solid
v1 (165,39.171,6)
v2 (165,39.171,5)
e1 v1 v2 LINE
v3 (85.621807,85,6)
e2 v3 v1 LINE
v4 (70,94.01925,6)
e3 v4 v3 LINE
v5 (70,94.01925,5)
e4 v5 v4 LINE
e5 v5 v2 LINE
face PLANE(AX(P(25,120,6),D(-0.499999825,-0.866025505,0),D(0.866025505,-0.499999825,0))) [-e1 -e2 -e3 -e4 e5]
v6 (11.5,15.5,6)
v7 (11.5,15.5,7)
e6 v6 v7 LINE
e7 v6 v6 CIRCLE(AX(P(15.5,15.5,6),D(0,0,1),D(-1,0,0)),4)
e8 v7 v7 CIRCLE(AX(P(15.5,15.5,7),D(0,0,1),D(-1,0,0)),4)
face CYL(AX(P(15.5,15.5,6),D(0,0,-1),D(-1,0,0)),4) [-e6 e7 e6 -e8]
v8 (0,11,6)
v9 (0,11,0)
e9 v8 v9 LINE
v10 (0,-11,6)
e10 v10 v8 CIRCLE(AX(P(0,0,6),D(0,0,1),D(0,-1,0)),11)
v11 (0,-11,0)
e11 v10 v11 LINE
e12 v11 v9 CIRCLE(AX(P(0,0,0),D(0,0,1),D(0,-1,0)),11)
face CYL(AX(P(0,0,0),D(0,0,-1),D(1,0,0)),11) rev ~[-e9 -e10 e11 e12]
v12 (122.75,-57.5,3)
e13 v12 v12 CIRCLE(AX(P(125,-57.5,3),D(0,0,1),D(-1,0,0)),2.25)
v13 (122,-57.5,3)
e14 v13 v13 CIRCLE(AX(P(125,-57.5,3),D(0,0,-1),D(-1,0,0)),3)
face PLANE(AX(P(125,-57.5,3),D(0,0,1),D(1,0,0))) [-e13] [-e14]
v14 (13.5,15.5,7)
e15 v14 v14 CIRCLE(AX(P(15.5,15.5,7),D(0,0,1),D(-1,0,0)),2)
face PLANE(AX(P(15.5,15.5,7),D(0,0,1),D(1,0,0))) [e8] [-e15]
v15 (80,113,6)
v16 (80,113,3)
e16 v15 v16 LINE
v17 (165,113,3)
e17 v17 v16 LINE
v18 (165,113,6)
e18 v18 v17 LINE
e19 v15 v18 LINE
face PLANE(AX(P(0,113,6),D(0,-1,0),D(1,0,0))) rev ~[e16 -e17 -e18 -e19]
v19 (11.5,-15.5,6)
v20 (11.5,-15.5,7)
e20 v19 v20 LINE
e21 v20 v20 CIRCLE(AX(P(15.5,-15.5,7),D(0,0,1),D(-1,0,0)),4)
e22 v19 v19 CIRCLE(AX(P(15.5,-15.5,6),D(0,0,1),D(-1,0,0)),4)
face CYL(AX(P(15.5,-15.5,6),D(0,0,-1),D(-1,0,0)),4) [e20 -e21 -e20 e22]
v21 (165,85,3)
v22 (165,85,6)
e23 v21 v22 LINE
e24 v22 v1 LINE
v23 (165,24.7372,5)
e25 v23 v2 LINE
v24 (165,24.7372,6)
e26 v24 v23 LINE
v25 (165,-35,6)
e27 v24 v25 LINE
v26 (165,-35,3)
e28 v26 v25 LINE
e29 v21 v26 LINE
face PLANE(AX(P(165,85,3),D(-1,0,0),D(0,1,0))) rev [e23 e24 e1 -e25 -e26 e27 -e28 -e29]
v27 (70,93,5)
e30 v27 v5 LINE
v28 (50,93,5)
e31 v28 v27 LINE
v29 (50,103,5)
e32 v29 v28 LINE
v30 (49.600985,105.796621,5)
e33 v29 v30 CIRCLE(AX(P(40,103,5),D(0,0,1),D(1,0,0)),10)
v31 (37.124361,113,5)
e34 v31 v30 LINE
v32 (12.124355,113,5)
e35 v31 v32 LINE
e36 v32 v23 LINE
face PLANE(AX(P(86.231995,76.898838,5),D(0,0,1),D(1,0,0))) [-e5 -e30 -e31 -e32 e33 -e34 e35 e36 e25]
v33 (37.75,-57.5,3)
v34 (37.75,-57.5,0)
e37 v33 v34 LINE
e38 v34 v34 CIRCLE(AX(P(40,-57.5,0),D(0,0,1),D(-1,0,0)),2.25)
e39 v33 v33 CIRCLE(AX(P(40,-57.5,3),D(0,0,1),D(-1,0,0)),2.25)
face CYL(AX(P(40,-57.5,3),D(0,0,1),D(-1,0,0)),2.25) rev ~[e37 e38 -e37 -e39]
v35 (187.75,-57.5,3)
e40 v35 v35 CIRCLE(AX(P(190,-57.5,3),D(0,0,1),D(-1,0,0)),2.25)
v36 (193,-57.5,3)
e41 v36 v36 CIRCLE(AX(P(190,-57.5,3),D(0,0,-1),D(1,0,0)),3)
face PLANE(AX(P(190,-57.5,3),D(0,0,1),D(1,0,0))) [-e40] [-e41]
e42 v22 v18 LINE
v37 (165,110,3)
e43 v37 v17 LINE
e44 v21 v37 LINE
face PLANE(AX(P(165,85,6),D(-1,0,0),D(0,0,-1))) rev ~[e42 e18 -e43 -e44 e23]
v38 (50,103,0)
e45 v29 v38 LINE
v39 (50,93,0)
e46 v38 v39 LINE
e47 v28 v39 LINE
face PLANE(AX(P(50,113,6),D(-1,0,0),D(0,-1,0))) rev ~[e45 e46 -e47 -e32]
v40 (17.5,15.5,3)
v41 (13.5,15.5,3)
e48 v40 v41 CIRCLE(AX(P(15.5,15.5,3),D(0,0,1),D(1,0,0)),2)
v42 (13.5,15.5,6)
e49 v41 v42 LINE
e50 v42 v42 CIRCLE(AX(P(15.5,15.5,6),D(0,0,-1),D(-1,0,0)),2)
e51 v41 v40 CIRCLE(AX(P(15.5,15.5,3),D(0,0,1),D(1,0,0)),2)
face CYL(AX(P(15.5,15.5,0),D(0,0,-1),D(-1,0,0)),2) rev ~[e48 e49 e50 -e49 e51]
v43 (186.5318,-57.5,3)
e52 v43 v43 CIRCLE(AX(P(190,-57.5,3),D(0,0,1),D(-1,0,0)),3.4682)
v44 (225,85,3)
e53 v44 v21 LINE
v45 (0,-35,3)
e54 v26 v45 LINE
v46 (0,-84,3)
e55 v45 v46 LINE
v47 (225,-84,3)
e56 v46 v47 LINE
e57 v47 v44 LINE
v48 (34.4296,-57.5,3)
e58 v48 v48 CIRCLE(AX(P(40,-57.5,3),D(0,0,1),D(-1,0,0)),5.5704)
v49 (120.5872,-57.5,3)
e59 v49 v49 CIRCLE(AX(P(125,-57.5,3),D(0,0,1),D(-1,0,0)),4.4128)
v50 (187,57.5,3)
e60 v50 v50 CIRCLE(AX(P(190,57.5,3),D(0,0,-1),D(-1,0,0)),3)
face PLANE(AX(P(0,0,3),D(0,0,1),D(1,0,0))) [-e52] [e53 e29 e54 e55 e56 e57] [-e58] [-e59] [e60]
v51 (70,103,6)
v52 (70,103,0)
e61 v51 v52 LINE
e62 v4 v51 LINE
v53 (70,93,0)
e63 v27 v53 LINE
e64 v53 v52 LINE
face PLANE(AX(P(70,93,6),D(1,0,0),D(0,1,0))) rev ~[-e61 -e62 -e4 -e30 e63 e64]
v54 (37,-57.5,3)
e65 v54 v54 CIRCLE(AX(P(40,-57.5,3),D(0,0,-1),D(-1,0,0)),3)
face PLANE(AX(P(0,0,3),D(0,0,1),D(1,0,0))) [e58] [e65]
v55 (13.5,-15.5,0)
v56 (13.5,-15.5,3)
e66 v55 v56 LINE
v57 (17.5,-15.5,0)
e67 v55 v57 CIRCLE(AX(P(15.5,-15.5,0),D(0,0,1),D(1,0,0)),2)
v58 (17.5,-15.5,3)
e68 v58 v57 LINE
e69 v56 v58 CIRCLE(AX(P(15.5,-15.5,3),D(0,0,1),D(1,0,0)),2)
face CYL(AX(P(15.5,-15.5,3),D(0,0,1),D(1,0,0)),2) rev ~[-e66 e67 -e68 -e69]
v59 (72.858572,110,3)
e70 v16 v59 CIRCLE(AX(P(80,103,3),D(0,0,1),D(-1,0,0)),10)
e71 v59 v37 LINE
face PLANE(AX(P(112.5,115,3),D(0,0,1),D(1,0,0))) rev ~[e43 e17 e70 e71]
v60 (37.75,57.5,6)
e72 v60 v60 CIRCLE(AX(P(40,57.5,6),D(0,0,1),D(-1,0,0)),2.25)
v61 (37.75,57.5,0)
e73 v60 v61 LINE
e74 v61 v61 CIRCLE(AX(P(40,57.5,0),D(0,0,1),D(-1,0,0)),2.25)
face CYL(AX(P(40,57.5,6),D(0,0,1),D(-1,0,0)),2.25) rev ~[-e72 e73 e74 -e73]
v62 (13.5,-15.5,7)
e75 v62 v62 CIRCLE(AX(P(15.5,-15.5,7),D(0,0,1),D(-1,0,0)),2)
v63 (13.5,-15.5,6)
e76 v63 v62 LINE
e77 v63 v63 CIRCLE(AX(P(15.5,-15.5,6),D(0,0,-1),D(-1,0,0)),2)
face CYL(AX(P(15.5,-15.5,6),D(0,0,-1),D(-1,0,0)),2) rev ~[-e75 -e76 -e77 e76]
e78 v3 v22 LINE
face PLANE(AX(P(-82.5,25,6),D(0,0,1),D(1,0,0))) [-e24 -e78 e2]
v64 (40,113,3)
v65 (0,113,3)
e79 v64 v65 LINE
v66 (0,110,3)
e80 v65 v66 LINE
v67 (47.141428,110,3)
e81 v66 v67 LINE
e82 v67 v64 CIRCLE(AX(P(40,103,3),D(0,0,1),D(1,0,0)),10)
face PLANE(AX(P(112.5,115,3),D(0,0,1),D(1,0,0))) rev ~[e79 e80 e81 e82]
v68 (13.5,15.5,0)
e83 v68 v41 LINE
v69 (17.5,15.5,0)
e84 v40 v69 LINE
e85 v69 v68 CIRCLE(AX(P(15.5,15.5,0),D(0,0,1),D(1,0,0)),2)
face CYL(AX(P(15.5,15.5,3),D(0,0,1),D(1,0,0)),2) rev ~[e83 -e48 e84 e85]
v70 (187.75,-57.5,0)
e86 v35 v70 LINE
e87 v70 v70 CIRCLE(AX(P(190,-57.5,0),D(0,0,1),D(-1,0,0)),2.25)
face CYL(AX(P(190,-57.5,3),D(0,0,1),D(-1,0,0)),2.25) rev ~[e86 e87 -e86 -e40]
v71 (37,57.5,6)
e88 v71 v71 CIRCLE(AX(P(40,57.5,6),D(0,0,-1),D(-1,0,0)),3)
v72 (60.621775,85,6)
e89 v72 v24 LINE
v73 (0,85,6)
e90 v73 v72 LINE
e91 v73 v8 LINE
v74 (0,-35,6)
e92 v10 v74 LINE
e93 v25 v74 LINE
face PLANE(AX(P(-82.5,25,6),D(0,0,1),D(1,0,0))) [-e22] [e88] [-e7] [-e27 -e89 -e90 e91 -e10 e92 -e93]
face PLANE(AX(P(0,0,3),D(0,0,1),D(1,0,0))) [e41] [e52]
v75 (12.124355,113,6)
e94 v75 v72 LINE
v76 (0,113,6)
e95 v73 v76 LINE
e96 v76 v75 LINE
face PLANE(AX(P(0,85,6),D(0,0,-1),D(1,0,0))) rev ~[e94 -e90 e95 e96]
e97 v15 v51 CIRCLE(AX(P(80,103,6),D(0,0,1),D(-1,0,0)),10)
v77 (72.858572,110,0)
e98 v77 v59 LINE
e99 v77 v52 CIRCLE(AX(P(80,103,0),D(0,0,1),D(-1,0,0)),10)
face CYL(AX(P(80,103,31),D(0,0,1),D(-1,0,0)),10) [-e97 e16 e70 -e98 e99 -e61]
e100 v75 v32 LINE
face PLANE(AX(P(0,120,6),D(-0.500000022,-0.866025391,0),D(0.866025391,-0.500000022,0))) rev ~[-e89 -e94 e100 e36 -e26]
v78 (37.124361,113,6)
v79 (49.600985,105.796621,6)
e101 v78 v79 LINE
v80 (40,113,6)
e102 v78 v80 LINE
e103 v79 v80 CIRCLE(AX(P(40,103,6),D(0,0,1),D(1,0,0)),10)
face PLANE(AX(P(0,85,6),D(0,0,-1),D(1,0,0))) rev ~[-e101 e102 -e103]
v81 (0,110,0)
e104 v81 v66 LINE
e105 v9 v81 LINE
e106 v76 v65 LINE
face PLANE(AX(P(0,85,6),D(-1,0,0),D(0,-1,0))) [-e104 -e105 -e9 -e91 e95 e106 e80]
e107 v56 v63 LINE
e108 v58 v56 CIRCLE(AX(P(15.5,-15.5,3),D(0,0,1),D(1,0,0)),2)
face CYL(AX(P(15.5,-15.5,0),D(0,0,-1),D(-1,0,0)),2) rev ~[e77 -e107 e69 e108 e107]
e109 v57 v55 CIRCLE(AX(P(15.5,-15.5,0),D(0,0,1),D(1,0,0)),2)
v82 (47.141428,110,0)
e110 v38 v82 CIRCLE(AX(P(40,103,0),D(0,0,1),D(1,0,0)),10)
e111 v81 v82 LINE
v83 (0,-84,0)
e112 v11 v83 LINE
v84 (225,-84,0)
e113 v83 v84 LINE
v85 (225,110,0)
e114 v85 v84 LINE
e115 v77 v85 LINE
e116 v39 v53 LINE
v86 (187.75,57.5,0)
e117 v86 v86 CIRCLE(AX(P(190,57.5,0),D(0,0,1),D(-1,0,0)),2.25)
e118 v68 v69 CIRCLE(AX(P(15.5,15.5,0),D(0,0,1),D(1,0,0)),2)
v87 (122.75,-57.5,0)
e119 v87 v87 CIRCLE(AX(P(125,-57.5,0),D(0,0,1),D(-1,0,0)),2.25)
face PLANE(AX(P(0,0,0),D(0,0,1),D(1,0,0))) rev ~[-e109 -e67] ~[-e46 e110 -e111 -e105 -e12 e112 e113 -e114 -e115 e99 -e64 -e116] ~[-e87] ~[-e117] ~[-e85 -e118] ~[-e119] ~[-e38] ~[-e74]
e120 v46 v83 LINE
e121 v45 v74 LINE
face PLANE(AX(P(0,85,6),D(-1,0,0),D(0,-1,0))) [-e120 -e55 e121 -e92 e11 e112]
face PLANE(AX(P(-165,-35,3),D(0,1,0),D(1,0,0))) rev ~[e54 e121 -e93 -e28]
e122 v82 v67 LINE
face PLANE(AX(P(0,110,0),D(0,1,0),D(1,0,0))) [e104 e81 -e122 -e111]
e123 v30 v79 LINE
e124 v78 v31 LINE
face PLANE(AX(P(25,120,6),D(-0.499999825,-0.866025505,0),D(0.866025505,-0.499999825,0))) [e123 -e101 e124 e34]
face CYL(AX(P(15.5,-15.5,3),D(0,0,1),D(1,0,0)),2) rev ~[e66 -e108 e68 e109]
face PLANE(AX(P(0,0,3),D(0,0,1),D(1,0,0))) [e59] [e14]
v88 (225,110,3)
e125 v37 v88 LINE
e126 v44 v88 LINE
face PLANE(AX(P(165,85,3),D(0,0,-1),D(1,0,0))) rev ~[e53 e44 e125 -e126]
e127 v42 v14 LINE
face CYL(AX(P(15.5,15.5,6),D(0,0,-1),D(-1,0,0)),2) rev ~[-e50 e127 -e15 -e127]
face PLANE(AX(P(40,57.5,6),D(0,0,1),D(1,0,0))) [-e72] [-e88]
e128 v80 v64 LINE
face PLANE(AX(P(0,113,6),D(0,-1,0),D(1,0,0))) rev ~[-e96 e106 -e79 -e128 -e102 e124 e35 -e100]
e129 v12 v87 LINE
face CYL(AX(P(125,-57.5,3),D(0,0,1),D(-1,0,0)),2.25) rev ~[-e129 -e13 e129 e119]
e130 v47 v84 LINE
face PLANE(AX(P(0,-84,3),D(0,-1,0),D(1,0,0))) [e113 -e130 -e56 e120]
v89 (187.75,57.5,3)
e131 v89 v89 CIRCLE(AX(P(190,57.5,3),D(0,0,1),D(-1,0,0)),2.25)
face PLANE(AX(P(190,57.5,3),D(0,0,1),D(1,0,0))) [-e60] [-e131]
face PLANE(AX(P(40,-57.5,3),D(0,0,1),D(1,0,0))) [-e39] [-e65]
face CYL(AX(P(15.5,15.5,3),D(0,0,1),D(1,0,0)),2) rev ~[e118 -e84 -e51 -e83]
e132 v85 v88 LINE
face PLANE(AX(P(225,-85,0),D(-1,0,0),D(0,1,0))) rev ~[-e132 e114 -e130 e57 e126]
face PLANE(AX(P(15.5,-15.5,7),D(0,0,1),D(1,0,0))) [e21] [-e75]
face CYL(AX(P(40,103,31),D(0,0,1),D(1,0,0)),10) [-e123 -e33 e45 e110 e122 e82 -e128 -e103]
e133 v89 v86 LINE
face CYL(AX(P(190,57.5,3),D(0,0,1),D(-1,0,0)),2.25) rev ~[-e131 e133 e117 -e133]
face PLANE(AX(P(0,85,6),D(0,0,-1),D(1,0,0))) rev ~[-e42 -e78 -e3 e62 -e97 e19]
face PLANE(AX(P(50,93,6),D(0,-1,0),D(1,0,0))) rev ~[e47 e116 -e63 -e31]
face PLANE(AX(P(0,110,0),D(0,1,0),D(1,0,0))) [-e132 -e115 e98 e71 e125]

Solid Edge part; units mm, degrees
sketch "Sketch1" plane through (0, 0, 0) normal (0, 0, 1) x (1, 0, 0)
  line L0 (-225, -85) -> (225, -85)
  line L1 (225, -85) -> (225, 85)
  line L2 (225, 85) -> (-225, 85)
  line L3 (-225, 85) -> (-225, -85)
  dimension "D1" = 450
  dimension "D2" = 170
extrude "Protrusion1" add sketch "Sketch1" along normal blind 3
sketch "Sketch2" plane through (0, 0, 3) normal (0, 0, 1) x (1, 0, 0)
  circle A0 centre (-190, 57.5) radius 3
  circle A1 centre (-190, -57.5) radius 3
  circle A2 centre (190, -57.5) radius 3
  circle A3 centre (190, 57.5) radius 3
  dimension "D1" = 380
  dimension "D2" = 115
  dimension "D3" = 6
extrude "Cutout1" cut sketch "Sketch2" against normal through all
sketch "Sketch3" plane through (0, 0, 3) normal (0, 0, 1) x (1, 0, 0)
  circle A0 centre (-15.5, 15.5) radius 2
  circle A1 centre (15.5, 15.5) radius 2
  circle A2 centre (15.5, -15.5) radius 2
  circle A3 centre (-15.5, -15.5) radius 2
  dimension "D1" = 31
  dimension "D2" = 4
extrude "Cutout2" cut sketch "Sketch3" against normal through all
sketch "Sketch4" plane through (-112.5, 0, 3) normal (0, 0, 1) x (1, 0, 0)
  circle A0 centre (-12.5, -57.5) radius 3
  dimension "D1" = 125
  dimension "D2" = 6
extrude "Cutout3" cut sketch "Sketch4" against normal through all
sketch "Sketch5" plane through (-112.5, 0, 3) normal (0, 0, 1) x (1, 0, 0)
  line L0 (112.5, 85) -> (-52.5, 85)
  line L1 (-52.5, 85) -> (-52.5, -35)
  line L2 (-52.5, -35) -> (112.5, -35)
  line L3 (112.5, -35) -> (112.5, 85)
  dimension "D1" = 120
  dimension "D2" = 165
extrude "Protrusion2" add sketch "Sketch5" along normal blind 3
sketch "Sketch6" plane through (-112.5, 0, 3) normal (0, 0, 1) x (1, 0, 0)
  circle A0 centre (72.5, -57.5) radius 3
  circle A1 centre (72.5, 57.5) radius 3
extrude "Cutout4" cut sketch "Sketch6" against normal through all
sketch "Sketch7" plane through (-112.5, 0, 0) normal (0, 0, -1) x (1, 0, 0)
  circle A0 centre (97, 15.5) radius 2
  circle A1 centre (97, -15.5) radius 2
  circle A2 centre (72.5, -57.5) radius 3
extrude "Cutout5" cut sketch "Sketch7" against normal through all
mirror "Mirror1" about plane through (0, 0, 0) normal (1, 0, 0) of "Protrusion2", "Cutout3"
mirror "Mirror2" about plane through (0, 0, 0) normal (1, 0, 0) of "Protrusion2", "Cutout3", "Cutout1"
mirror "Mirror3" about plane through (0, 0, 0) normal (1, 0, 0) of "Cutout5", "Cutout4"
sketch "Sketch8" plane through (0, 25, 6) normal (0, 0, 1) x (1, 0, 0)
  line L0 (0, 60) -> (0, -110)
extrude "Cutout8" cut sketch "Sketch8" against normal through all material side at (-0.05, 0, 6)
sketch "Sketch9" plane through (112.5, 0, 0) normal (0, 0, -1) x (1, 0, 0)
  circle A0 centre (-112.5, 0) radius 11
extrude "Cutout9" cut sketch "Sketch9" against normal through all
sketch "Sketch10" plane through (112.5, 0, 3) normal (0, 0, 1) x (-1, 0, 0)
  line L0 (-112.5, 85) -> (112.5, 85)
  line L1 (112.5, 85) -> (112.5, 84)
  line L2 (112.5, 84) -> (-112.5, 84)
  line L3 (-112.5, 84) -> (-112.5, 85)
  dimension "D1" = 1
extrude "Cutout10" cut sketch "Sketch10" against normal through all
sketch "Sketch11" plane through (112.5, 85, 3) normal (0, 1, 0) x (-1, 0, 0)
  line L0 (-112.5, -3) -> (112.5, -3)
  line L1 (112.5, -3) -> (112.5, 3)
  line L2 (112.5, 3) -> (-52.5, 3)
  line L3 (-52.5, 3) -> (-52.5, 0)
  line L4 (-52.5, 0) -> (-112.5, 0)
  line L5 (-112.5, 0) -> (-112.5, -3)
extrude "Extrusionsausprägung_4" add sketch "Sketch11" along normal blind 35
sketch "Sketch12" plane through (82.5, 42.5, 6) normal (0, 0, 1) x (0, 1, 0)
  line L0 (77.5, 82.5) -> (-17.7628, -82.5)
  line L1 (-17.7628, -82.5) -> (-3.329, -82.5)
  line L2 (77.5, 57.5) -> (-3.329, -82.5)
  line L3 (77.5, 57.5) -> (77.5, 82.5)
  dimension "D1" = 25
extrude "Extrusionsausschnitt_12" cut sketch "Sketch12" against normal blind 1
sketch "Sketch13" plane through (112.5, 18, 0) normal (0, 0, -1) x (-1, 0, 0)
  line L0 (-112.5, 102) -> (112.5, 102)
  line L1 (112.5, 102) -> (112.5, 92)
  line L2 (112.5, 92) -> (-112.5, 92)
  line L3 (-112.5, 92) -> (-112.5, 102)
  dimension "D1" = 10
extrude "Extrusionsausschnitt_13" cut sketch "Sketch13" against normal blind 3
sketch "Sketch14" plane through (82.5, 42.5, 6) normal (0, 0, 1) x (-1, 0, 0)
  circle A0 centre (42.5, -15) radius 3
  circle A1 centre (42.5, -15) radius 2.25
extrude "Protrusion4" add sketch "Sketch14" against normal up to vertex (6 mm away)
sketch "Sketch15" plane through (112.5, 13, 3) normal (0, 0, 1) x (-1, 0, 0)
  circle A0 centre (-77.5, 70.5) radius 2.25
  circle A1 centre (-12.5, 70.5) radius 2.25
  circle A2 centre (72.5, 70.5) radius 2.25
  circle A3 centre (-77.5, -44.5) radius 2.25
  circle A4 centre (-77.5, 70.5) radius 3.4682
  circle A5 centre (-12.5, 70.5) radius 4.4128
  circle A6 centre (72.5, 70.5) radius 5.5704
  circle A7 centre (-77.5, -44.5) radius 3
extrude "Protrusion5" add sketch "Sketch15" against normal up to vertex (3 mm away)
sketch "Sketch16" plane through (82.5, 42.5, 6) normal (0, 0, 1) x (-1, 0, 0)
  circle A0 centre (67, 58) radius 2
  circle A1 centre (67, 58) radius 4
  circle A2 centre (67, 27) radius 4
  circle A3 centre (67, 27) radius 2
  dimension "D1" = 8
extrude "Extrusionsausprägung_7" add sketch "Sketch16" along normal blind 1
sketch "Sketch17" plane through (95, 79.5855, 6) normal (0, 0, 1) x (-1, 0, 0)
  line L0 (-70, -40.4145) -> (95, -40.4145)
  line L1 (95, -40.4145) -> (95, -33.4145)
  line L2 (95, -33.4145) -> (-70, -33.4145)
  line L3 (-70, -33.4145) -> (-70, -40.4145)
  dimension "D1" = 7
extrude "Cutout11" cut sketch "Sketch17" against normal up to next
sketch "Sketch18" plane through (82.5, 39, 6) normal (0, 0, 1) x (-1, 0, 0)
  line L0 (12.5, -74) -> (32.5, -74)
  line L1 (32.5, -74) -> (32.5, -54)
  line L2 (32.5, -54) -> (12.5, -54)
  line L3 (12.5, -54) -> (12.5, -74)
  dimension "D1" = 20
  dimension "D2" = 20
  dimension "D3" = 60
extrude "Cutout12" cut sketch "Sketch18" against normal through all
fillet "Verrundung_1" radius 10 2 edges at (70, 113, 4.5) (50, 113, 4.5)
properties material "Nylon, allgemein"
